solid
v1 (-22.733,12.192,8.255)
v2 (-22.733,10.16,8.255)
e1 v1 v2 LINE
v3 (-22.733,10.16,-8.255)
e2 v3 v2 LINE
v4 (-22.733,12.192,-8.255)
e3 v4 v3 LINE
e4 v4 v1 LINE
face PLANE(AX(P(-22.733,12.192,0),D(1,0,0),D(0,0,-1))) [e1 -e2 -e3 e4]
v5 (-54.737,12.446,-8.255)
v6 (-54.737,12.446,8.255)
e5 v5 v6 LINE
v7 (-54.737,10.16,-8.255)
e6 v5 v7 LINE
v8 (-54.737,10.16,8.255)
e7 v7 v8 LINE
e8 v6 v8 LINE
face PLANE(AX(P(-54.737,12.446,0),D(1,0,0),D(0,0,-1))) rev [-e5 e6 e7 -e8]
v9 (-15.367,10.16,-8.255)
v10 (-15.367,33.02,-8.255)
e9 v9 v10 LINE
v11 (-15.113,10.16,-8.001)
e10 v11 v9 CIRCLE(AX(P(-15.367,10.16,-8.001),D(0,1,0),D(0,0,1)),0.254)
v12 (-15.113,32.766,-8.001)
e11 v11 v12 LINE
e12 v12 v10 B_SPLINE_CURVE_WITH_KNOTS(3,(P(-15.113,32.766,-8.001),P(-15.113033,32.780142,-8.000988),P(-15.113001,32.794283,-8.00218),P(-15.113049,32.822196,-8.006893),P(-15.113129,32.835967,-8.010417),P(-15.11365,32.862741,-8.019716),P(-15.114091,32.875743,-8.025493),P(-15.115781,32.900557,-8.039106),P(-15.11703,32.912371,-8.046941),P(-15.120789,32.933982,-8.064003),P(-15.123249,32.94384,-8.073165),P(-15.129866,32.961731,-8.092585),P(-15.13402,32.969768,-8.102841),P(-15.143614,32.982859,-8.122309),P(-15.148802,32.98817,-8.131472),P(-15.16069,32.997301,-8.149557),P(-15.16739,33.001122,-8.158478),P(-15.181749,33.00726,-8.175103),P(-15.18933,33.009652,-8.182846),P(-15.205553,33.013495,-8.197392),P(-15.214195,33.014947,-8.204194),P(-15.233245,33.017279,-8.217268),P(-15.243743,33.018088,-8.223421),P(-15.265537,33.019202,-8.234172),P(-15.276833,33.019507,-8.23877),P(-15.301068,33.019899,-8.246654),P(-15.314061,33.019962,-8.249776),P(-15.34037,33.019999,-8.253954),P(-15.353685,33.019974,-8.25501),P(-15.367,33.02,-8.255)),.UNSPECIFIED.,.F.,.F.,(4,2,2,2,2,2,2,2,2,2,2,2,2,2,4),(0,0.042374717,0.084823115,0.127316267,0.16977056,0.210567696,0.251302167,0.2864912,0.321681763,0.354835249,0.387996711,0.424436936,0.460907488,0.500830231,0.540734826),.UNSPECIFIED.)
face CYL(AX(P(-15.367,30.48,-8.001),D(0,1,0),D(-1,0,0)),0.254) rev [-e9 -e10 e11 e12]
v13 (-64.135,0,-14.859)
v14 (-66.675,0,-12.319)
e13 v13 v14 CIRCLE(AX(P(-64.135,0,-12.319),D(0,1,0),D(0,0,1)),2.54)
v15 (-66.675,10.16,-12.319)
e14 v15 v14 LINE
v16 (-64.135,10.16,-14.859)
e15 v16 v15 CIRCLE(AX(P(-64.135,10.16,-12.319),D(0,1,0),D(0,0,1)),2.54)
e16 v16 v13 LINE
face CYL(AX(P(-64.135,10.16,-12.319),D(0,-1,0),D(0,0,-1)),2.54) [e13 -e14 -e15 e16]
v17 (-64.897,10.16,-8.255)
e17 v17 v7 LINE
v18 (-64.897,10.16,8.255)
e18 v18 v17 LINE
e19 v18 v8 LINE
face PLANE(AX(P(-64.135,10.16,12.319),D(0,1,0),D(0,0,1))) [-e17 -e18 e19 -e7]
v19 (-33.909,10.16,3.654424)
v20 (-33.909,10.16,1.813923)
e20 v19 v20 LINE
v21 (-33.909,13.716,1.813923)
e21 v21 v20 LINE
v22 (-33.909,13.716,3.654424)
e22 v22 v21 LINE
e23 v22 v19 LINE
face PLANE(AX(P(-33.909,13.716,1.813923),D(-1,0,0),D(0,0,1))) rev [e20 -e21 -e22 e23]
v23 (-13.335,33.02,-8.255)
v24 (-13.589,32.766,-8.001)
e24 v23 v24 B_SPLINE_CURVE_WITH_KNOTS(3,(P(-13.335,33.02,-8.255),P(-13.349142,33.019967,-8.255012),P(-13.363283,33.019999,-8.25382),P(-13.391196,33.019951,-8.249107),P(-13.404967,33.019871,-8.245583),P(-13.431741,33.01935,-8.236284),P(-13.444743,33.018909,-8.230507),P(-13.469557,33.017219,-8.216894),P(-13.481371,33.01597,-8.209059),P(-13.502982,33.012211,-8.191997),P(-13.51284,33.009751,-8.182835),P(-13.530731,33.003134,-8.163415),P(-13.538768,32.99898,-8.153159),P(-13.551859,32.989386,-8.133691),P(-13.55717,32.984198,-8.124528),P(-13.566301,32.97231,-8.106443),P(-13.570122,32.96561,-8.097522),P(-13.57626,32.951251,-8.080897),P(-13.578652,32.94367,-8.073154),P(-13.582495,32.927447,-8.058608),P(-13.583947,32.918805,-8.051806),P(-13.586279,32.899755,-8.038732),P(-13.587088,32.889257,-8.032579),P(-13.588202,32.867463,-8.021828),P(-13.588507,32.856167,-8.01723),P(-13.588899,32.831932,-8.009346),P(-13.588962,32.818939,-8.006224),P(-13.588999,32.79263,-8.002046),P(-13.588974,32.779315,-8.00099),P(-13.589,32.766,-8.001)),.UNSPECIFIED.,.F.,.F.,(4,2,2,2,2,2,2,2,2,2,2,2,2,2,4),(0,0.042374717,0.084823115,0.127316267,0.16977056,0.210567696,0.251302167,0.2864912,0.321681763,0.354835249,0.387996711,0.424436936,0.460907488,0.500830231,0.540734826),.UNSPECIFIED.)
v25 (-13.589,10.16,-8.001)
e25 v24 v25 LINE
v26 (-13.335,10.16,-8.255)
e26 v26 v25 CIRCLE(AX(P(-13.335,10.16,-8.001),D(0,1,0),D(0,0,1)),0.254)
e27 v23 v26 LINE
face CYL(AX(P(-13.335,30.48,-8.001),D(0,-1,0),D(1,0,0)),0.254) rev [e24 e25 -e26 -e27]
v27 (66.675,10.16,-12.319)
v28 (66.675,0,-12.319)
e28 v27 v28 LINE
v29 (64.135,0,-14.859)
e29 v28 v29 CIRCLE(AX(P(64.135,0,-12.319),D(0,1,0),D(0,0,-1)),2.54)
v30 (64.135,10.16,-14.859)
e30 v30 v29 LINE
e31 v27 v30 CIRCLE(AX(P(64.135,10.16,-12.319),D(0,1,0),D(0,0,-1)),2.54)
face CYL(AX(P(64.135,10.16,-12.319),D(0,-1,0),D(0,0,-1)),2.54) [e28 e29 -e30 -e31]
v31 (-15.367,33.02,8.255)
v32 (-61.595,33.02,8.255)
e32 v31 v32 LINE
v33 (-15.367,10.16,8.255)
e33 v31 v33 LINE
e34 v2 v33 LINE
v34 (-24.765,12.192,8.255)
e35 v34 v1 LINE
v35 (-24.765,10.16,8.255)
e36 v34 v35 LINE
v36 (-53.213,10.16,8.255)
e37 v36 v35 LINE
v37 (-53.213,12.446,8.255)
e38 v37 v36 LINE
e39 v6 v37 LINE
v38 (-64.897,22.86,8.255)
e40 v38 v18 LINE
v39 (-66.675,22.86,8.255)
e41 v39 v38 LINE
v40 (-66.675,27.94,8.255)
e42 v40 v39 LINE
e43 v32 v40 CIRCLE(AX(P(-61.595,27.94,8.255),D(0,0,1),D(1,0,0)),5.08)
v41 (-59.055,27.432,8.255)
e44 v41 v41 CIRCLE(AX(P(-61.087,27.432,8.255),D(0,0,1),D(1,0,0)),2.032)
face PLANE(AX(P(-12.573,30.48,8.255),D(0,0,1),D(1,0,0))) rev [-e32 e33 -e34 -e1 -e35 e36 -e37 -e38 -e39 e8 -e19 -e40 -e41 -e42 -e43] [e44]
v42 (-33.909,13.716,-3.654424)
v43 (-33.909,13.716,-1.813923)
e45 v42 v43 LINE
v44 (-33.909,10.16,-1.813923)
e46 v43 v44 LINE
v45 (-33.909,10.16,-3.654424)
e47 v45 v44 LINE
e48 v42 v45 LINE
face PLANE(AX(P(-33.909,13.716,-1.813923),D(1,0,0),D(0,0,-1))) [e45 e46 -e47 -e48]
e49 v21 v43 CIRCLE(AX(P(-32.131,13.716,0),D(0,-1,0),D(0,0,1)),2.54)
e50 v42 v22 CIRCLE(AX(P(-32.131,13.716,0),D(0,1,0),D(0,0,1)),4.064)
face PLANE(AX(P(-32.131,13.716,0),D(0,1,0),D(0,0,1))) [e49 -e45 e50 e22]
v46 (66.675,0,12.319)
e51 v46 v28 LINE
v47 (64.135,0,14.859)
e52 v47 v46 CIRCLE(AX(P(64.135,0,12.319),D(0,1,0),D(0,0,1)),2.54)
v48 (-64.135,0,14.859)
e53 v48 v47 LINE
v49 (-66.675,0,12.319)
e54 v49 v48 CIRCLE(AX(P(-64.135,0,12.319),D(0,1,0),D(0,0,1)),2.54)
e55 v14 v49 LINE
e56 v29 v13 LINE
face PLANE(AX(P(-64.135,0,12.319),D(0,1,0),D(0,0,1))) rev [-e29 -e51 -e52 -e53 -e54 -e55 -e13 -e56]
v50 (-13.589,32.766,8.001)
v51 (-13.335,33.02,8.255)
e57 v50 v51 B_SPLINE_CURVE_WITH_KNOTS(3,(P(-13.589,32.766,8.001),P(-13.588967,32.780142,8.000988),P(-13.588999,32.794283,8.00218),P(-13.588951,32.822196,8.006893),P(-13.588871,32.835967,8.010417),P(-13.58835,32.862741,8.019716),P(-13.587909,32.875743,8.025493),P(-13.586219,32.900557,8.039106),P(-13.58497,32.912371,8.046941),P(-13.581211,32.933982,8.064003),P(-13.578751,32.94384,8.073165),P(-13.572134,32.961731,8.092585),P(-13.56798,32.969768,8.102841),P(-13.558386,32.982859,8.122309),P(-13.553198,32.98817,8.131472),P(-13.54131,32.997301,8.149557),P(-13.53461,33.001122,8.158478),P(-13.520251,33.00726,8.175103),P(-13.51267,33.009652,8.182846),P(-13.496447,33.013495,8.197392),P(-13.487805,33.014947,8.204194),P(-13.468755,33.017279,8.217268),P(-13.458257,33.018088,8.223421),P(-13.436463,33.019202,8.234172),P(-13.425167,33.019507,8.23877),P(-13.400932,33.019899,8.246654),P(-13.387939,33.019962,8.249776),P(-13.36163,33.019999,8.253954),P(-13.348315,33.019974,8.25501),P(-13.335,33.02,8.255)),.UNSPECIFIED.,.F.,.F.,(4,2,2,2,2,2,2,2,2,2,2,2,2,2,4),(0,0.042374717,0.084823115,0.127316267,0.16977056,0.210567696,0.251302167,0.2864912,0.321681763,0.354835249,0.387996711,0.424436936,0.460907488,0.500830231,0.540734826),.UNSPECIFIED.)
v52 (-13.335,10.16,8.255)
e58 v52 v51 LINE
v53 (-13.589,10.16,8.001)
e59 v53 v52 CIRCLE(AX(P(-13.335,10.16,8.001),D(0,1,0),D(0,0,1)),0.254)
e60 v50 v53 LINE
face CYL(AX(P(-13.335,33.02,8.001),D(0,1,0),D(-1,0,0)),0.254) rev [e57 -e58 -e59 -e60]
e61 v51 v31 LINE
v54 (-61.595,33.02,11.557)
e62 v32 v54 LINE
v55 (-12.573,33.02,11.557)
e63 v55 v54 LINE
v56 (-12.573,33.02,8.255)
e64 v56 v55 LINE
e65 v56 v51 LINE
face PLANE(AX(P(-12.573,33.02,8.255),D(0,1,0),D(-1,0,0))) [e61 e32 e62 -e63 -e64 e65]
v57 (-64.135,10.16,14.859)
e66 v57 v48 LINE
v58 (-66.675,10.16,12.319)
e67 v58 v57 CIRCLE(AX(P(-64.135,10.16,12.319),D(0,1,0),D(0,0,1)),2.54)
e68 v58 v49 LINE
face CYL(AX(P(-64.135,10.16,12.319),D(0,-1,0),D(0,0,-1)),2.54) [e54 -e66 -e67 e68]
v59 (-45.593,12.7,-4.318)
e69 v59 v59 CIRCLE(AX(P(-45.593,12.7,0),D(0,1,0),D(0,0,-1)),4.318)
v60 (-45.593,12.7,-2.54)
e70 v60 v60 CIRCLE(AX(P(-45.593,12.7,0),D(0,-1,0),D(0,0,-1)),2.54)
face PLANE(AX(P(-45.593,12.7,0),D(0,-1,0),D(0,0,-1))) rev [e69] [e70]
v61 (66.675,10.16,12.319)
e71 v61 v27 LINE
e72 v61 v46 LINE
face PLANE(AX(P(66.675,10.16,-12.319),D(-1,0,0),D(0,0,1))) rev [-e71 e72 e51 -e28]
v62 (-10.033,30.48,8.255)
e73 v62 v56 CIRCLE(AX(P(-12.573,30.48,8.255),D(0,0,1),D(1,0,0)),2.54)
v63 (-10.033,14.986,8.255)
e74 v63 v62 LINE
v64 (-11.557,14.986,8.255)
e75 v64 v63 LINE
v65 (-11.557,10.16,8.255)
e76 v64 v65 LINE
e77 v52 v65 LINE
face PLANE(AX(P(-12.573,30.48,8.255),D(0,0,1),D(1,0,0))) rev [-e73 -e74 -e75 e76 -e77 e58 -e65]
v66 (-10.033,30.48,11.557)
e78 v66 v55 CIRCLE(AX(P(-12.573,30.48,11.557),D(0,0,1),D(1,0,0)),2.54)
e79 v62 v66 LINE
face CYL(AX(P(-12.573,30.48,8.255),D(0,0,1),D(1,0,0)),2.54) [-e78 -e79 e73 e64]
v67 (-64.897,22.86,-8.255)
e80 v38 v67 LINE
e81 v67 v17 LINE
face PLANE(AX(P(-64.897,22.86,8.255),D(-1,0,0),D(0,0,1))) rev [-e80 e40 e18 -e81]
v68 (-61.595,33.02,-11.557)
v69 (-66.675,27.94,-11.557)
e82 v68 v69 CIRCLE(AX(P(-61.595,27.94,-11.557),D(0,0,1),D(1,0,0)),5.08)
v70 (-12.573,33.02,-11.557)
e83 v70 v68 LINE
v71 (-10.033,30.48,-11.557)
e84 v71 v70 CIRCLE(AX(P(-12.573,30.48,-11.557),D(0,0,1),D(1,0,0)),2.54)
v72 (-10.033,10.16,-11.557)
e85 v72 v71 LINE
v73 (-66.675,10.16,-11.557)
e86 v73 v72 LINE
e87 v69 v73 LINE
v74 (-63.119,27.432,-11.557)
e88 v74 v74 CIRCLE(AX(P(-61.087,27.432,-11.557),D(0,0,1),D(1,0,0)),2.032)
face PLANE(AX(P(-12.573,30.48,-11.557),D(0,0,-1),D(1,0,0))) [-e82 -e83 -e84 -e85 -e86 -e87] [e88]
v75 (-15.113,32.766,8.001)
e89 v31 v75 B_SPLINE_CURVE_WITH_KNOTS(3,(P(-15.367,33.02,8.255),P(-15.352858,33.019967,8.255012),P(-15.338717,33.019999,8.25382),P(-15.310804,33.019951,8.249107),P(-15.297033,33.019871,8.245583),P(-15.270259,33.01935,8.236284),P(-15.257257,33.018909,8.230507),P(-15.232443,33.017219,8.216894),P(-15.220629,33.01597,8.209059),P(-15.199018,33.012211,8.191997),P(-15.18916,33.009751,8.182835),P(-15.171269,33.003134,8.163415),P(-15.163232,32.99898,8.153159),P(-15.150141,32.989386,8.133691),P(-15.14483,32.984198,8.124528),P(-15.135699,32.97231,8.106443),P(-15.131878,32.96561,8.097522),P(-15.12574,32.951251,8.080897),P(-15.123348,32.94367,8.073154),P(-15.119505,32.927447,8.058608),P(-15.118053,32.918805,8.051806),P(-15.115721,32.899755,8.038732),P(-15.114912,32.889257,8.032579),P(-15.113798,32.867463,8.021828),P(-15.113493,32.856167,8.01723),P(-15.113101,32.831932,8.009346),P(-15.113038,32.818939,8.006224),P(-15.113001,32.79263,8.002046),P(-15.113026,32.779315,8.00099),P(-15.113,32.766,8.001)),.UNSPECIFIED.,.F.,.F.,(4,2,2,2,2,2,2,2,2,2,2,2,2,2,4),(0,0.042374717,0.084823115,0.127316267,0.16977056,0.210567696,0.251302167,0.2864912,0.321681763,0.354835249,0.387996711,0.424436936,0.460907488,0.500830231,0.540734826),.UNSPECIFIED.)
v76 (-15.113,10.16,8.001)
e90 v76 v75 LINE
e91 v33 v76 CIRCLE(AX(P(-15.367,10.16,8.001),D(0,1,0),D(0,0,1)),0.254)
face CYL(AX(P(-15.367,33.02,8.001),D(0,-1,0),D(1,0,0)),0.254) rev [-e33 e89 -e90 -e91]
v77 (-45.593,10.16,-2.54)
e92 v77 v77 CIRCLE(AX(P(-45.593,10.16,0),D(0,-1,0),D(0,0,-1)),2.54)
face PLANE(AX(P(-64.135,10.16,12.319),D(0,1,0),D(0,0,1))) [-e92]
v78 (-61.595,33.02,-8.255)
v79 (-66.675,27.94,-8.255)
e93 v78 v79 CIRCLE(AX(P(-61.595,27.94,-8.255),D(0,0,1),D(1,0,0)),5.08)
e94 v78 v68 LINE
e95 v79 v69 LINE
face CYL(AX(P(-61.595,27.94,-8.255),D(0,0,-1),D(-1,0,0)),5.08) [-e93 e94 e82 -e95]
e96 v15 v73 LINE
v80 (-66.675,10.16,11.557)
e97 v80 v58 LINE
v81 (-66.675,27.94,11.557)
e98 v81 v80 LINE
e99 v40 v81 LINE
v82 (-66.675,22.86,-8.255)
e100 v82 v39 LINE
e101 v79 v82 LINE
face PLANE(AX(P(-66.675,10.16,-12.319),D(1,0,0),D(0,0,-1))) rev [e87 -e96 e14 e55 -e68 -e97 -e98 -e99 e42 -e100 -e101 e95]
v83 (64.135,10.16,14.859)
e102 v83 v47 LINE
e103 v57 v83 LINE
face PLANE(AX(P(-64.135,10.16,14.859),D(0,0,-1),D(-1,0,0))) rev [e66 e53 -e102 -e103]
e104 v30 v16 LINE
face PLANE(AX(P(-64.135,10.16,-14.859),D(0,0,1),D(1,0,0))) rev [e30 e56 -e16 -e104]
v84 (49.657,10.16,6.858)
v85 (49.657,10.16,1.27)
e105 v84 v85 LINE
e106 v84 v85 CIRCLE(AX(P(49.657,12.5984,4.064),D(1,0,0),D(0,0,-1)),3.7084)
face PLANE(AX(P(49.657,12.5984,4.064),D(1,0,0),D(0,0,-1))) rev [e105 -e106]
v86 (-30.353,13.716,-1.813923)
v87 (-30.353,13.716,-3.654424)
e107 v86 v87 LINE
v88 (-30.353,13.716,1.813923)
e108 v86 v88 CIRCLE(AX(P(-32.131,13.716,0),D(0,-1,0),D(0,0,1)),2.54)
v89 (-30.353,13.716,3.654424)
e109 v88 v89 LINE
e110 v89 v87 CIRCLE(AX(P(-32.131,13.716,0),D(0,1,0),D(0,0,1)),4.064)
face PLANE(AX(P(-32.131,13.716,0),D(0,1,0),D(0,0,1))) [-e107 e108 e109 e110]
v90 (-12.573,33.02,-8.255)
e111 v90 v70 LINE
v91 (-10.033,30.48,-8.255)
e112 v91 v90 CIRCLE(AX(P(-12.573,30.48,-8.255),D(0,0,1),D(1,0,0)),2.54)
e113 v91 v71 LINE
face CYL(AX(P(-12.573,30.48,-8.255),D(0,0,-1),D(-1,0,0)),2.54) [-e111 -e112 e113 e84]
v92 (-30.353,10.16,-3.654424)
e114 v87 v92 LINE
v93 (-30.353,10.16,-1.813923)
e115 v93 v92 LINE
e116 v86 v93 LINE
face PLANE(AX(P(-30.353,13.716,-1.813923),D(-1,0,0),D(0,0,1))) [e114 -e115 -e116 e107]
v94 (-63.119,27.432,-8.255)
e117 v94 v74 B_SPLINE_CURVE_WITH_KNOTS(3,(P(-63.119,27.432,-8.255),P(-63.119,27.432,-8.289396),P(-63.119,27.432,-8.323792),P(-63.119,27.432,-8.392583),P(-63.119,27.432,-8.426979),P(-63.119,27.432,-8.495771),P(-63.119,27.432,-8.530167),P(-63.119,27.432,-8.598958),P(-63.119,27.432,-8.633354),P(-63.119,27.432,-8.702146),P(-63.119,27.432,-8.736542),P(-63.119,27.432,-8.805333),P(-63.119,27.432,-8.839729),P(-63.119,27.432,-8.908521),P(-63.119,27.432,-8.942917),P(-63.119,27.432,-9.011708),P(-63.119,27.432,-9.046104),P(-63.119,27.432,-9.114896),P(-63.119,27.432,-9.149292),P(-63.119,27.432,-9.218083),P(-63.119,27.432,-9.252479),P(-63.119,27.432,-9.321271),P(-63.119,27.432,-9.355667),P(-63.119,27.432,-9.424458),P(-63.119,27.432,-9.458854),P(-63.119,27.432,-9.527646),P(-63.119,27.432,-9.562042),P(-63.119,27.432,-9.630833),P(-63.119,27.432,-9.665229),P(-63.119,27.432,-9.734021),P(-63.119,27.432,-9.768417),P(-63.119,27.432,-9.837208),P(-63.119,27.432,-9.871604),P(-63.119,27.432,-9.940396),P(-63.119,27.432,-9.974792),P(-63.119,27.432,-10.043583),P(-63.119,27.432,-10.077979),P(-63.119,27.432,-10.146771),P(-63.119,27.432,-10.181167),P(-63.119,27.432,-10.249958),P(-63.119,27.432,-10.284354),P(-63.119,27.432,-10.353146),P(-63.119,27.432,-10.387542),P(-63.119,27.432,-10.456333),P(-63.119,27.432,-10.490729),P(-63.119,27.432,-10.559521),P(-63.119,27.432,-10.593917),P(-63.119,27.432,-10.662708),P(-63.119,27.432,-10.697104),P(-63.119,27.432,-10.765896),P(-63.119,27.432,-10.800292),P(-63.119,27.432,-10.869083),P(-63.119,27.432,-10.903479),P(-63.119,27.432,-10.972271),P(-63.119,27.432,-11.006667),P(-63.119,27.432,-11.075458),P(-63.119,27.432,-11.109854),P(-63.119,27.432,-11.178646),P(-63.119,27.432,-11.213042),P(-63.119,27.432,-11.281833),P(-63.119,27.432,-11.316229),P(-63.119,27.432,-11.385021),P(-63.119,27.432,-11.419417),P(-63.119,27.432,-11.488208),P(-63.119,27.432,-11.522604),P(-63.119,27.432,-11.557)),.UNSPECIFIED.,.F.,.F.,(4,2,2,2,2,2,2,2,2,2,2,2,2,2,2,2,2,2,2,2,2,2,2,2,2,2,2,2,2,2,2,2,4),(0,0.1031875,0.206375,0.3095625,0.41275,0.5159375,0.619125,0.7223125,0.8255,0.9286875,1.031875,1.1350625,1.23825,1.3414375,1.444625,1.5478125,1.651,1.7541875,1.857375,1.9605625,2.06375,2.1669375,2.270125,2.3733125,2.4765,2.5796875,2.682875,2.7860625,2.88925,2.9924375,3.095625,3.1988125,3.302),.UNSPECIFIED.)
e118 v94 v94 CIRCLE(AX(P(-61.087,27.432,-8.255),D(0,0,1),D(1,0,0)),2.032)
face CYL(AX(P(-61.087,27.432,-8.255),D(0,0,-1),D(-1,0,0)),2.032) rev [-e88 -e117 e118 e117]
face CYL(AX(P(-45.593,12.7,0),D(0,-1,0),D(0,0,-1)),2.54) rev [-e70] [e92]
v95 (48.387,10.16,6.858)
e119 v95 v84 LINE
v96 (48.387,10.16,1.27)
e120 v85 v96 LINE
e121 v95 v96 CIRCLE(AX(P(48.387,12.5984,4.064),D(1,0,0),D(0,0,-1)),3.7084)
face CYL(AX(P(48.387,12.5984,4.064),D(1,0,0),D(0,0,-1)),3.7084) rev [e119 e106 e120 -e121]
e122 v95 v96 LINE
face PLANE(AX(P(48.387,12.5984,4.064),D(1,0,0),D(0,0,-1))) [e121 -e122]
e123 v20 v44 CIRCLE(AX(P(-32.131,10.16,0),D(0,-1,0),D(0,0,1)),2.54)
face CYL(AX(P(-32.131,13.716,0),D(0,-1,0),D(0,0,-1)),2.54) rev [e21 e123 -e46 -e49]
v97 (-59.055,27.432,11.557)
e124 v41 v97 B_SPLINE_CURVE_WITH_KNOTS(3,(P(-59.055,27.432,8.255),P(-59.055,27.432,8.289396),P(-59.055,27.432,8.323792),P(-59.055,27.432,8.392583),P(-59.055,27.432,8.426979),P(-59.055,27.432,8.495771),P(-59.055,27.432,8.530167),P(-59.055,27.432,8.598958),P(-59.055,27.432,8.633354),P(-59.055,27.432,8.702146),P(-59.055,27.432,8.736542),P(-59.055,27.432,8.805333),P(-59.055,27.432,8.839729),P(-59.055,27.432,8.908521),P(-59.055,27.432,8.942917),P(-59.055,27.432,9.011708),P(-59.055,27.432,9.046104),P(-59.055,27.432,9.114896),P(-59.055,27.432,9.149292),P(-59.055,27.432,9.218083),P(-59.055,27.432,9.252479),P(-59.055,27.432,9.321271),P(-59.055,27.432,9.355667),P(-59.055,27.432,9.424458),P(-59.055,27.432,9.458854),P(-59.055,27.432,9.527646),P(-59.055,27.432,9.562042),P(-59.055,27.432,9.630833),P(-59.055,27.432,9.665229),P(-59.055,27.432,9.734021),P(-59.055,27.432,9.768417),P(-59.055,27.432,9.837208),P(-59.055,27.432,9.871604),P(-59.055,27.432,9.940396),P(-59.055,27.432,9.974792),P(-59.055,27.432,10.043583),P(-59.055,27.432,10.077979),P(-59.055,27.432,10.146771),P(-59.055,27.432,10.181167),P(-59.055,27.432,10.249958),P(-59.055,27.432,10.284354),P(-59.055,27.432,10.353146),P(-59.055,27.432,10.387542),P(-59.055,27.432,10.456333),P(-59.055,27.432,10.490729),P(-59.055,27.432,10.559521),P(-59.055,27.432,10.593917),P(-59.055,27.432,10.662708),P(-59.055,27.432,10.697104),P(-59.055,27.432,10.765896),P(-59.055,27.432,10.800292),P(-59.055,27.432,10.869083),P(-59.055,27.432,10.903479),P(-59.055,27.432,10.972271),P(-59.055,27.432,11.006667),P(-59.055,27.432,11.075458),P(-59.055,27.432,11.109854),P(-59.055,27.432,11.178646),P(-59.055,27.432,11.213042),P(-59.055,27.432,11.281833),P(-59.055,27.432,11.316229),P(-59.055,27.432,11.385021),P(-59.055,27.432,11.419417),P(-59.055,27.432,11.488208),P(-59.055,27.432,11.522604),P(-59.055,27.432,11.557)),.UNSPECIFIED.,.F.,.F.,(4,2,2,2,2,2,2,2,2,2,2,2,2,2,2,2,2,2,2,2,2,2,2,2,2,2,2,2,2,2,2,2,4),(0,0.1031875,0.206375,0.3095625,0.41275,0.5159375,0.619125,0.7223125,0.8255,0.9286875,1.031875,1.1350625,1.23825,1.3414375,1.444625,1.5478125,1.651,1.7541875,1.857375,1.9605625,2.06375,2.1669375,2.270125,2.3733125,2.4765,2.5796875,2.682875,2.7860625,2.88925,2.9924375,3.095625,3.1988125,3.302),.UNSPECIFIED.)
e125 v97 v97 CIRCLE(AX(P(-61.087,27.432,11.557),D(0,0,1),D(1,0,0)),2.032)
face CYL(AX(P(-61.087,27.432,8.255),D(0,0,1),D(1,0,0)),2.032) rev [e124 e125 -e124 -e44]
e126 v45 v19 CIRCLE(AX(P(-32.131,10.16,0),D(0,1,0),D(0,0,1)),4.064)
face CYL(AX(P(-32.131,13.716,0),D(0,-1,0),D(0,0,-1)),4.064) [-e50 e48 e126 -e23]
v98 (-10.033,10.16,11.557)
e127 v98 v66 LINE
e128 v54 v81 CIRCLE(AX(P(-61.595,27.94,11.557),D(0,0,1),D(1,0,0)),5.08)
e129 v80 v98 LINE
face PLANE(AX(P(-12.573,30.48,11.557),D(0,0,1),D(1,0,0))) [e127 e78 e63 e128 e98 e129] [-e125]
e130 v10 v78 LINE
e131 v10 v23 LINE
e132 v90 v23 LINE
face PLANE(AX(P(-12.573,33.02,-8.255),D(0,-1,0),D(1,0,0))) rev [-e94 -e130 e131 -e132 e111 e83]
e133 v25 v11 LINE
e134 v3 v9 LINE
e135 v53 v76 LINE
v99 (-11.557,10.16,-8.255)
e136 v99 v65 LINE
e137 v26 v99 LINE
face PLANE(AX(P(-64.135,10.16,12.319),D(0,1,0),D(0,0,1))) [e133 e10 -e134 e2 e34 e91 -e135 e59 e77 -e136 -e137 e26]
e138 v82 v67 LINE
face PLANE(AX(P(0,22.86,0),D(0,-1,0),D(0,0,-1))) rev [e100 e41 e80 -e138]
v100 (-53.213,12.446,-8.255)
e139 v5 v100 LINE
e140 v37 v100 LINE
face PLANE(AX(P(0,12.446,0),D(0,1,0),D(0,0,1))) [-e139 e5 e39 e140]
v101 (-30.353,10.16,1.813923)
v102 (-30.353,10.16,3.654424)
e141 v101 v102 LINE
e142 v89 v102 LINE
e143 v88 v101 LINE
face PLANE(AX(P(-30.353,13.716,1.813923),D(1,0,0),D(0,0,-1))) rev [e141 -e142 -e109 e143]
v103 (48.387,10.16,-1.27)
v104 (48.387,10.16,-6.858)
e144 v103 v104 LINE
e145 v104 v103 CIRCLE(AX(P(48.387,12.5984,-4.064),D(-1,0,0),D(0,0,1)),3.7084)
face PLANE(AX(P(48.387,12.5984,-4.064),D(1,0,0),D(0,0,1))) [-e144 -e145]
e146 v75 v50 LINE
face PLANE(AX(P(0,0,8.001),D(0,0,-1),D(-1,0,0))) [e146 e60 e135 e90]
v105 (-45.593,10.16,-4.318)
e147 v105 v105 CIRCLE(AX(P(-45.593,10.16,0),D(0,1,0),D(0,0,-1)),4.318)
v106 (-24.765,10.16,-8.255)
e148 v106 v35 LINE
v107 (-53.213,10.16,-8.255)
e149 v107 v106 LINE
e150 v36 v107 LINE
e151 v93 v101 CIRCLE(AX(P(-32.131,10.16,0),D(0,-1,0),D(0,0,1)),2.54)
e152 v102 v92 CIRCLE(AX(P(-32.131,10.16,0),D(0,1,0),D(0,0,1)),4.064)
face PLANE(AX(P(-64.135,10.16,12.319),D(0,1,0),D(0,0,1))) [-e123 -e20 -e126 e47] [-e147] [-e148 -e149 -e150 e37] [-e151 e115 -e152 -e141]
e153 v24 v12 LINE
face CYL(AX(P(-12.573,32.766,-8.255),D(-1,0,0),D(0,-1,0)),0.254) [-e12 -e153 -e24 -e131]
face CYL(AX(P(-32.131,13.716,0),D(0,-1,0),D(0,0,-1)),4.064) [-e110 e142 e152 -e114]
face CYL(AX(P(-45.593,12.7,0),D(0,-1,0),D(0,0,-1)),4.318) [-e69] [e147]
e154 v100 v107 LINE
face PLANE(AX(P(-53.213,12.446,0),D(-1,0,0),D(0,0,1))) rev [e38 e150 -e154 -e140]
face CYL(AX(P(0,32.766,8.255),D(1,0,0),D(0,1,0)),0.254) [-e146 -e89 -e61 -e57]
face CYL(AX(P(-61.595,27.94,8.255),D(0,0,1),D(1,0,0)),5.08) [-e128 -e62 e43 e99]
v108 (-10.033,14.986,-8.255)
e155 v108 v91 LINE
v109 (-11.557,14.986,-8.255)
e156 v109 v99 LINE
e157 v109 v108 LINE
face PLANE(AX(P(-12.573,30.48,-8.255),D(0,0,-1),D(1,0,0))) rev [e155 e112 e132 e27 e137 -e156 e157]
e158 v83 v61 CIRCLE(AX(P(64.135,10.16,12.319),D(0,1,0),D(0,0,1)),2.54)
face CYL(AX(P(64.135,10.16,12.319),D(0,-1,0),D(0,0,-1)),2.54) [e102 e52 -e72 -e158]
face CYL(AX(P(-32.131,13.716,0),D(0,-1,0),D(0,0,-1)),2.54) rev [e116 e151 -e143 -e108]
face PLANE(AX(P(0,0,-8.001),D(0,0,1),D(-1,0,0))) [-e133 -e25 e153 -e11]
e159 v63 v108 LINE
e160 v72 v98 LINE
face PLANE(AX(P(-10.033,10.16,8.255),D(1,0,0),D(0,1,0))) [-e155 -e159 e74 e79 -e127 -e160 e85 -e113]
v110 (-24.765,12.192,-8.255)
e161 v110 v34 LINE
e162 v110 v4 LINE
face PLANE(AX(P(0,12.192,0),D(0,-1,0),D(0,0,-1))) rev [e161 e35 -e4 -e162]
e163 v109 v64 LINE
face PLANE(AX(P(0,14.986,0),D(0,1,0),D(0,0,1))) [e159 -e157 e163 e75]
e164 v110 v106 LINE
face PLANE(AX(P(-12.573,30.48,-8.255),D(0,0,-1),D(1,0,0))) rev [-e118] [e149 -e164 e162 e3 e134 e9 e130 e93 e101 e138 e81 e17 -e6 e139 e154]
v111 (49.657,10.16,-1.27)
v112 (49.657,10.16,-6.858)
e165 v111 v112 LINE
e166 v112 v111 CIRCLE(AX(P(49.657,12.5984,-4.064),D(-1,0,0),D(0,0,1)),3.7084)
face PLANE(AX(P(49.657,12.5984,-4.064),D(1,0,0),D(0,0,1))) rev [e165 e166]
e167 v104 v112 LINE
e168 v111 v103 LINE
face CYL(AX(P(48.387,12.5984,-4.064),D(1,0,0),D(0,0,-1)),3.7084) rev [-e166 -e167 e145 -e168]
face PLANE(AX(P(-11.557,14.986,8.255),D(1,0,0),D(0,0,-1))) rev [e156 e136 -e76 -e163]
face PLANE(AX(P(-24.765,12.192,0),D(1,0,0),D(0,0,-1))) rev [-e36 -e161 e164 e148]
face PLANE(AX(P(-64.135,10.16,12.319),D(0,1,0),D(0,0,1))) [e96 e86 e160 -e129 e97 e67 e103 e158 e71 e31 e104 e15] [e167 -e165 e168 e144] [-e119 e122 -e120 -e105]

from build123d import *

# Parameters (mm, degrees)
BOSS_EXTRUDE1_DEPTH  = 10.16
SKETCH2_R            = 2.032
BOSS_EXTRUDE2_DEPTH  = 3.302
SKETCH3_W            = 1.778
SKETCH3_H            = 8.255
BOSS_EXTRUDE3_DEPTH  = 12.7
SKETCH4_W            = 1.524
SKETCH4_H            = 8.255
BOSS_EXTRUDE4_DEPTH  = 2.286
BOSS_EXTRUDE5_DEPTH  = 2.54
BOSS_EXTRUDE6_DEPTH  = 3.556
SKETCH7_W            = 2.032
SKETCH7_H            = 8.255
BOSS_EXTRUDE7_DEPTH  = 2.032
SKETCH8_W            = 1.524
SKETCH8_H            = 8.255
BOSS_EXTRUDE8_DEPTH  = 4.826
SKETCH9_W            = 1.524
SKETCH9_H            = 22.86
BOSS_EXTRUDE9_DEPTH  = 0.254
FILLET2_R            = 0.254
FILLET4_R            = 0.254
FILLET2_OF_MIRROR1_R = 0.254
FILLET4_OF_MIRROR1_R = 0.254
SKETCH10_R           = 3.7084
CUT_EXTRUDE1_DEPTH   = 1.27


with BuildPart() as part:
    # Sketch1 → Boss-Extrude1 (new body)
    with BuildSketch(Plane(origin=(0, 0, 0), x_dir=(1, 0, 0), z_dir=(0, 1, 0))):
        with BuildLine():
            Line((-64.135, 14.859), (64.135, 14.859))
            ThreePointArc((64.135, 14.859), (65.931051224, 14.115051224), (66.675, 12.319))
            Line((66.675, 12.319), (66.675, -12.319))
            ThreePointArc((66.675, -12.319), (65.931051224, -14.115051224), (64.135, -14.859))
            Line((64.135, -14.859), (-64.135, -14.859))
            ThreePointArc((-64.135, -14.859), (-65.931051224, -14.115051224), (-66.675, -12.319))
            Line((-66.675, -12.319), (-66.675, 12.319))
            ThreePointArc((-66.675, 12.319), (-65.931051224, 14.115051224), (-64.135, 14.859))
        make_face()
    extrude(amount=BOSS_EXTRUDE1_DEPTH)

    # Sketch2 → Boss-Extrude2 (add)
    with BuildSketch(Plane.XY.offset(11.557)):
        with BuildLine():
            Line((-10.033, 10.16), (-10.033, 30.48))
            ThreePointArc((-10.033, 30.48), (-10.776948776, 32.276051224), (-12.573, 33.02))
            Line((-12.573, 33.02), (-61.595, 33.02))
            ThreePointArc((-61.595, 33.02), (-65.187102448, 31.532102448), (-66.675, 27.94))
            Line((-66.675, 27.94), (-66.675, 10.16))
            Line((-66.675, 10.16), (-10.033, 10.16))
        make_face()
        with Locations((-61.087, 27.432)):
            Circle(SKETCH2_R, mode=Mode.SUBTRACT)
    boss_extrude2 = extrude(amount=-BOSS_EXTRUDE2_DEPTH)

    # Sketch3 → Boss-Extrude3 (add)
    with BuildSketch(Plane(origin=(0, 10.16, 0), x_dir=(1, 0, 0), z_dir=(0, 1, 0))):
        with Locations((-65.786, -4.1275)):
            Rectangle(SKETCH3_W, SKETCH3_H)
    boss_extrude3 = extrude(amount=BOSS_EXTRUDE3_DEPTH)

    # Sketch4 → Boss-Extrude4 (add)
    with BuildSketch(Plane(origin=(0, 10.16, 0), x_dir=(1, 0, 0), z_dir=(0, 1, 0))):
        with Locations((-53.975, -4.1275)):
            Rectangle(SKETCH4_W, SKETCH4_H)
    boss_extrude4 = extrude(amount=BOSS_EXTRUDE4_DEPTH)

    # Sketch5 → Boss-Extrude5 (add)
    with BuildSketch(Plane(origin=(0, 10.16, 0), x_dir=(1, 0, 0), z_dir=(0, 1, 0))):
        with BuildLine():
            Line((-48.133, 0), (-49.911, 0))
            ThreePointArc((-49.911, 0), (-45.593, -4.318), (-41.275, 0))
            Line((-41.275, 0), (-43.053, 0))
            ThreePointArc((-43.053, 0), (-45.593, -2.54), (-48.133, 0))
        make_face()
    boss_extrude5 = extrude(amount=BOSS_EXTRUDE5_DEPTH)

    # Sketch6 → Boss-Extrude6 (add)
    with BuildSketch(Plane(origin=(0, 10.16, 0), x_dir=(1, 0, 0), z_dir=(0, 1, 0))):
        with BuildLine():
            Line((-33.909, -1.813922821), (-33.909, -3.654423621))
            ThreePointArc((-33.909, -3.654423621), (-35.576423631, -2.155261469), (-36.195, 0))
            Line((-36.195, 0), (-34.671, 0))
            ThreePointArc((-34.671, 0), (-34.472764292, -0.98373777), (-33.909, -1.813922821))
        make_face()
        with BuildLine():
            Line((-30.353, -1.813922821), (-30.353, -3.654423621))
            ThreePointArc((-30.353, -3.654423621), (-28.685576369, -2.155261469), (-28.067, 0))
            Line((-28.067, 0), (-29.591, 0))
            ThreePointArc((-29.591, 0), (-29.789235708, -0.98373777), (-30.353, -1.813922821))
        make_face()
    boss_extrude6 = extrude(amount=BOSS_EXTRUDE6_DEPTH)

    # Sketch7 → Boss-Extrude7 (add)
    with BuildSketch(Plane(origin=(0, 10.16, 0), x_dir=(1, 0, 0), z_dir=(0, 1, 0))):
        with Locations((-23.749, -4.1275)):
            Rectangle(SKETCH7_W, SKETCH7_H)
    boss_extrude7 = extrude(amount=BOSS_EXTRUDE7_DEPTH)

    # Sketch8 → Boss-Extrude8 (add)
    with BuildSketch(Plane(origin=(0, 10.16, 0), x_dir=(1, 0, 0), z_dir=(0, 1, 0))):
        with Locations((-10.795, -4.1275)):
            Rectangle(SKETCH8_W, SKETCH8_H)
    boss_extrude8 = extrude(amount=BOSS_EXTRUDE8_DEPTH)

    # Sketch9 → Boss-Extrude9 (add)
    with BuildSketch(Plane(origin=(0, 0, 8.255), x_dir=(-1, 0, 0), z_dir=(0, 0, -1))):
        with Locations((14.351, 21.59)):
            Rectangle(SKETCH9_W, SKETCH9_H)
    boss_extrude9 = extrude(amount=BOSS_EXTRUDE9_DEPTH)

    # Fillet2
    fillet2_edges = [part.edges().sort_by_distance(p)[0] for p in [
        (-13.589, 21.59, 8.255),
        (-15.113, 21.59, 8.255),
    ]]
    fillet(fillet2_edges, radius=FILLET2_R - 0.0001)  # a hair under: the kernel refuses the full size

    # Fillet4
    fillet4_edges = [part.edges().sort_by_distance(p)[0] for p in [
        (-14.351, 33.02, 8.001),
    ]]
    fillet(fillet4_edges, radius=FILLET4_R - 0.0001)  # a hair under: the kernel refuses the full size

    # Mirror1: Boss-Extrude2, Boss-Extrude3, Boss-Extrude4, Boss-Extrude5, Boss-Extrude6, Boss-Extrude7, Boss-Extrude8, Boss-Extrude9 across plane
    add(boss_extrude2.mirror(Plane.XY))
    add(boss_extrude3.mirror(Plane.XY))
    add(boss_extrude4.mirror(Plane.XY))
    add(boss_extrude5.mirror(Plane.XY))
    add(boss_extrude6.mirror(Plane.XY))
    add(boss_extrude7.mirror(Plane.XY))
    add(boss_extrude8.mirror(Plane.XY))
    add(boss_extrude9.mirror(Plane.XY))

    # Fillet2 of Mirror1
    fillet2_of_mirror1_edges = [part.edges().sort_by_distance(p)[0] for p in [
        (-13.589, 21.59, -8.255),
        (-15.113, 21.59, -8.255),
    ]]
    fillet(fillet2_of_mirror1_edges, radius=FILLET2_OF_MIRROR1_R - 0.0001)  # a hair under: the kernel refuses the full size

    # Fillet4 of Mirror1
    fillet4_of_mirror1_edges = [part.edges().sort_by_distance(p)[0] for p in [
        (-14.351, 33.02, -8.001),
    ]]
    fillet(fillet4_of_mirror1_edges, radius=FILLET4_OF_MIRROR1_R - 0.0001)  # a hair under: the kernel refuses the full size

    # Sketch10 → Cut-Extrude1 (cut)
    with BuildSketch(Plane(origin=(49.657, 0, 0), x_dir=(0, 0, -1), z_dir=(1, 0, 0))):
        with Locations((-4.064, 12.5984)):
            Circle(SKETCH10_R)
    cut_extrude1 = extrude(amount=-CUT_EXTRUDE1_DEPTH, mode=Mode.SUBTRACT)

    # Mirror2: Cut-Extrude1 across plane
    add(cut_extrude1.mirror(Plane.XY), mode=Mode.SUBTRACT)


solid = part.part
